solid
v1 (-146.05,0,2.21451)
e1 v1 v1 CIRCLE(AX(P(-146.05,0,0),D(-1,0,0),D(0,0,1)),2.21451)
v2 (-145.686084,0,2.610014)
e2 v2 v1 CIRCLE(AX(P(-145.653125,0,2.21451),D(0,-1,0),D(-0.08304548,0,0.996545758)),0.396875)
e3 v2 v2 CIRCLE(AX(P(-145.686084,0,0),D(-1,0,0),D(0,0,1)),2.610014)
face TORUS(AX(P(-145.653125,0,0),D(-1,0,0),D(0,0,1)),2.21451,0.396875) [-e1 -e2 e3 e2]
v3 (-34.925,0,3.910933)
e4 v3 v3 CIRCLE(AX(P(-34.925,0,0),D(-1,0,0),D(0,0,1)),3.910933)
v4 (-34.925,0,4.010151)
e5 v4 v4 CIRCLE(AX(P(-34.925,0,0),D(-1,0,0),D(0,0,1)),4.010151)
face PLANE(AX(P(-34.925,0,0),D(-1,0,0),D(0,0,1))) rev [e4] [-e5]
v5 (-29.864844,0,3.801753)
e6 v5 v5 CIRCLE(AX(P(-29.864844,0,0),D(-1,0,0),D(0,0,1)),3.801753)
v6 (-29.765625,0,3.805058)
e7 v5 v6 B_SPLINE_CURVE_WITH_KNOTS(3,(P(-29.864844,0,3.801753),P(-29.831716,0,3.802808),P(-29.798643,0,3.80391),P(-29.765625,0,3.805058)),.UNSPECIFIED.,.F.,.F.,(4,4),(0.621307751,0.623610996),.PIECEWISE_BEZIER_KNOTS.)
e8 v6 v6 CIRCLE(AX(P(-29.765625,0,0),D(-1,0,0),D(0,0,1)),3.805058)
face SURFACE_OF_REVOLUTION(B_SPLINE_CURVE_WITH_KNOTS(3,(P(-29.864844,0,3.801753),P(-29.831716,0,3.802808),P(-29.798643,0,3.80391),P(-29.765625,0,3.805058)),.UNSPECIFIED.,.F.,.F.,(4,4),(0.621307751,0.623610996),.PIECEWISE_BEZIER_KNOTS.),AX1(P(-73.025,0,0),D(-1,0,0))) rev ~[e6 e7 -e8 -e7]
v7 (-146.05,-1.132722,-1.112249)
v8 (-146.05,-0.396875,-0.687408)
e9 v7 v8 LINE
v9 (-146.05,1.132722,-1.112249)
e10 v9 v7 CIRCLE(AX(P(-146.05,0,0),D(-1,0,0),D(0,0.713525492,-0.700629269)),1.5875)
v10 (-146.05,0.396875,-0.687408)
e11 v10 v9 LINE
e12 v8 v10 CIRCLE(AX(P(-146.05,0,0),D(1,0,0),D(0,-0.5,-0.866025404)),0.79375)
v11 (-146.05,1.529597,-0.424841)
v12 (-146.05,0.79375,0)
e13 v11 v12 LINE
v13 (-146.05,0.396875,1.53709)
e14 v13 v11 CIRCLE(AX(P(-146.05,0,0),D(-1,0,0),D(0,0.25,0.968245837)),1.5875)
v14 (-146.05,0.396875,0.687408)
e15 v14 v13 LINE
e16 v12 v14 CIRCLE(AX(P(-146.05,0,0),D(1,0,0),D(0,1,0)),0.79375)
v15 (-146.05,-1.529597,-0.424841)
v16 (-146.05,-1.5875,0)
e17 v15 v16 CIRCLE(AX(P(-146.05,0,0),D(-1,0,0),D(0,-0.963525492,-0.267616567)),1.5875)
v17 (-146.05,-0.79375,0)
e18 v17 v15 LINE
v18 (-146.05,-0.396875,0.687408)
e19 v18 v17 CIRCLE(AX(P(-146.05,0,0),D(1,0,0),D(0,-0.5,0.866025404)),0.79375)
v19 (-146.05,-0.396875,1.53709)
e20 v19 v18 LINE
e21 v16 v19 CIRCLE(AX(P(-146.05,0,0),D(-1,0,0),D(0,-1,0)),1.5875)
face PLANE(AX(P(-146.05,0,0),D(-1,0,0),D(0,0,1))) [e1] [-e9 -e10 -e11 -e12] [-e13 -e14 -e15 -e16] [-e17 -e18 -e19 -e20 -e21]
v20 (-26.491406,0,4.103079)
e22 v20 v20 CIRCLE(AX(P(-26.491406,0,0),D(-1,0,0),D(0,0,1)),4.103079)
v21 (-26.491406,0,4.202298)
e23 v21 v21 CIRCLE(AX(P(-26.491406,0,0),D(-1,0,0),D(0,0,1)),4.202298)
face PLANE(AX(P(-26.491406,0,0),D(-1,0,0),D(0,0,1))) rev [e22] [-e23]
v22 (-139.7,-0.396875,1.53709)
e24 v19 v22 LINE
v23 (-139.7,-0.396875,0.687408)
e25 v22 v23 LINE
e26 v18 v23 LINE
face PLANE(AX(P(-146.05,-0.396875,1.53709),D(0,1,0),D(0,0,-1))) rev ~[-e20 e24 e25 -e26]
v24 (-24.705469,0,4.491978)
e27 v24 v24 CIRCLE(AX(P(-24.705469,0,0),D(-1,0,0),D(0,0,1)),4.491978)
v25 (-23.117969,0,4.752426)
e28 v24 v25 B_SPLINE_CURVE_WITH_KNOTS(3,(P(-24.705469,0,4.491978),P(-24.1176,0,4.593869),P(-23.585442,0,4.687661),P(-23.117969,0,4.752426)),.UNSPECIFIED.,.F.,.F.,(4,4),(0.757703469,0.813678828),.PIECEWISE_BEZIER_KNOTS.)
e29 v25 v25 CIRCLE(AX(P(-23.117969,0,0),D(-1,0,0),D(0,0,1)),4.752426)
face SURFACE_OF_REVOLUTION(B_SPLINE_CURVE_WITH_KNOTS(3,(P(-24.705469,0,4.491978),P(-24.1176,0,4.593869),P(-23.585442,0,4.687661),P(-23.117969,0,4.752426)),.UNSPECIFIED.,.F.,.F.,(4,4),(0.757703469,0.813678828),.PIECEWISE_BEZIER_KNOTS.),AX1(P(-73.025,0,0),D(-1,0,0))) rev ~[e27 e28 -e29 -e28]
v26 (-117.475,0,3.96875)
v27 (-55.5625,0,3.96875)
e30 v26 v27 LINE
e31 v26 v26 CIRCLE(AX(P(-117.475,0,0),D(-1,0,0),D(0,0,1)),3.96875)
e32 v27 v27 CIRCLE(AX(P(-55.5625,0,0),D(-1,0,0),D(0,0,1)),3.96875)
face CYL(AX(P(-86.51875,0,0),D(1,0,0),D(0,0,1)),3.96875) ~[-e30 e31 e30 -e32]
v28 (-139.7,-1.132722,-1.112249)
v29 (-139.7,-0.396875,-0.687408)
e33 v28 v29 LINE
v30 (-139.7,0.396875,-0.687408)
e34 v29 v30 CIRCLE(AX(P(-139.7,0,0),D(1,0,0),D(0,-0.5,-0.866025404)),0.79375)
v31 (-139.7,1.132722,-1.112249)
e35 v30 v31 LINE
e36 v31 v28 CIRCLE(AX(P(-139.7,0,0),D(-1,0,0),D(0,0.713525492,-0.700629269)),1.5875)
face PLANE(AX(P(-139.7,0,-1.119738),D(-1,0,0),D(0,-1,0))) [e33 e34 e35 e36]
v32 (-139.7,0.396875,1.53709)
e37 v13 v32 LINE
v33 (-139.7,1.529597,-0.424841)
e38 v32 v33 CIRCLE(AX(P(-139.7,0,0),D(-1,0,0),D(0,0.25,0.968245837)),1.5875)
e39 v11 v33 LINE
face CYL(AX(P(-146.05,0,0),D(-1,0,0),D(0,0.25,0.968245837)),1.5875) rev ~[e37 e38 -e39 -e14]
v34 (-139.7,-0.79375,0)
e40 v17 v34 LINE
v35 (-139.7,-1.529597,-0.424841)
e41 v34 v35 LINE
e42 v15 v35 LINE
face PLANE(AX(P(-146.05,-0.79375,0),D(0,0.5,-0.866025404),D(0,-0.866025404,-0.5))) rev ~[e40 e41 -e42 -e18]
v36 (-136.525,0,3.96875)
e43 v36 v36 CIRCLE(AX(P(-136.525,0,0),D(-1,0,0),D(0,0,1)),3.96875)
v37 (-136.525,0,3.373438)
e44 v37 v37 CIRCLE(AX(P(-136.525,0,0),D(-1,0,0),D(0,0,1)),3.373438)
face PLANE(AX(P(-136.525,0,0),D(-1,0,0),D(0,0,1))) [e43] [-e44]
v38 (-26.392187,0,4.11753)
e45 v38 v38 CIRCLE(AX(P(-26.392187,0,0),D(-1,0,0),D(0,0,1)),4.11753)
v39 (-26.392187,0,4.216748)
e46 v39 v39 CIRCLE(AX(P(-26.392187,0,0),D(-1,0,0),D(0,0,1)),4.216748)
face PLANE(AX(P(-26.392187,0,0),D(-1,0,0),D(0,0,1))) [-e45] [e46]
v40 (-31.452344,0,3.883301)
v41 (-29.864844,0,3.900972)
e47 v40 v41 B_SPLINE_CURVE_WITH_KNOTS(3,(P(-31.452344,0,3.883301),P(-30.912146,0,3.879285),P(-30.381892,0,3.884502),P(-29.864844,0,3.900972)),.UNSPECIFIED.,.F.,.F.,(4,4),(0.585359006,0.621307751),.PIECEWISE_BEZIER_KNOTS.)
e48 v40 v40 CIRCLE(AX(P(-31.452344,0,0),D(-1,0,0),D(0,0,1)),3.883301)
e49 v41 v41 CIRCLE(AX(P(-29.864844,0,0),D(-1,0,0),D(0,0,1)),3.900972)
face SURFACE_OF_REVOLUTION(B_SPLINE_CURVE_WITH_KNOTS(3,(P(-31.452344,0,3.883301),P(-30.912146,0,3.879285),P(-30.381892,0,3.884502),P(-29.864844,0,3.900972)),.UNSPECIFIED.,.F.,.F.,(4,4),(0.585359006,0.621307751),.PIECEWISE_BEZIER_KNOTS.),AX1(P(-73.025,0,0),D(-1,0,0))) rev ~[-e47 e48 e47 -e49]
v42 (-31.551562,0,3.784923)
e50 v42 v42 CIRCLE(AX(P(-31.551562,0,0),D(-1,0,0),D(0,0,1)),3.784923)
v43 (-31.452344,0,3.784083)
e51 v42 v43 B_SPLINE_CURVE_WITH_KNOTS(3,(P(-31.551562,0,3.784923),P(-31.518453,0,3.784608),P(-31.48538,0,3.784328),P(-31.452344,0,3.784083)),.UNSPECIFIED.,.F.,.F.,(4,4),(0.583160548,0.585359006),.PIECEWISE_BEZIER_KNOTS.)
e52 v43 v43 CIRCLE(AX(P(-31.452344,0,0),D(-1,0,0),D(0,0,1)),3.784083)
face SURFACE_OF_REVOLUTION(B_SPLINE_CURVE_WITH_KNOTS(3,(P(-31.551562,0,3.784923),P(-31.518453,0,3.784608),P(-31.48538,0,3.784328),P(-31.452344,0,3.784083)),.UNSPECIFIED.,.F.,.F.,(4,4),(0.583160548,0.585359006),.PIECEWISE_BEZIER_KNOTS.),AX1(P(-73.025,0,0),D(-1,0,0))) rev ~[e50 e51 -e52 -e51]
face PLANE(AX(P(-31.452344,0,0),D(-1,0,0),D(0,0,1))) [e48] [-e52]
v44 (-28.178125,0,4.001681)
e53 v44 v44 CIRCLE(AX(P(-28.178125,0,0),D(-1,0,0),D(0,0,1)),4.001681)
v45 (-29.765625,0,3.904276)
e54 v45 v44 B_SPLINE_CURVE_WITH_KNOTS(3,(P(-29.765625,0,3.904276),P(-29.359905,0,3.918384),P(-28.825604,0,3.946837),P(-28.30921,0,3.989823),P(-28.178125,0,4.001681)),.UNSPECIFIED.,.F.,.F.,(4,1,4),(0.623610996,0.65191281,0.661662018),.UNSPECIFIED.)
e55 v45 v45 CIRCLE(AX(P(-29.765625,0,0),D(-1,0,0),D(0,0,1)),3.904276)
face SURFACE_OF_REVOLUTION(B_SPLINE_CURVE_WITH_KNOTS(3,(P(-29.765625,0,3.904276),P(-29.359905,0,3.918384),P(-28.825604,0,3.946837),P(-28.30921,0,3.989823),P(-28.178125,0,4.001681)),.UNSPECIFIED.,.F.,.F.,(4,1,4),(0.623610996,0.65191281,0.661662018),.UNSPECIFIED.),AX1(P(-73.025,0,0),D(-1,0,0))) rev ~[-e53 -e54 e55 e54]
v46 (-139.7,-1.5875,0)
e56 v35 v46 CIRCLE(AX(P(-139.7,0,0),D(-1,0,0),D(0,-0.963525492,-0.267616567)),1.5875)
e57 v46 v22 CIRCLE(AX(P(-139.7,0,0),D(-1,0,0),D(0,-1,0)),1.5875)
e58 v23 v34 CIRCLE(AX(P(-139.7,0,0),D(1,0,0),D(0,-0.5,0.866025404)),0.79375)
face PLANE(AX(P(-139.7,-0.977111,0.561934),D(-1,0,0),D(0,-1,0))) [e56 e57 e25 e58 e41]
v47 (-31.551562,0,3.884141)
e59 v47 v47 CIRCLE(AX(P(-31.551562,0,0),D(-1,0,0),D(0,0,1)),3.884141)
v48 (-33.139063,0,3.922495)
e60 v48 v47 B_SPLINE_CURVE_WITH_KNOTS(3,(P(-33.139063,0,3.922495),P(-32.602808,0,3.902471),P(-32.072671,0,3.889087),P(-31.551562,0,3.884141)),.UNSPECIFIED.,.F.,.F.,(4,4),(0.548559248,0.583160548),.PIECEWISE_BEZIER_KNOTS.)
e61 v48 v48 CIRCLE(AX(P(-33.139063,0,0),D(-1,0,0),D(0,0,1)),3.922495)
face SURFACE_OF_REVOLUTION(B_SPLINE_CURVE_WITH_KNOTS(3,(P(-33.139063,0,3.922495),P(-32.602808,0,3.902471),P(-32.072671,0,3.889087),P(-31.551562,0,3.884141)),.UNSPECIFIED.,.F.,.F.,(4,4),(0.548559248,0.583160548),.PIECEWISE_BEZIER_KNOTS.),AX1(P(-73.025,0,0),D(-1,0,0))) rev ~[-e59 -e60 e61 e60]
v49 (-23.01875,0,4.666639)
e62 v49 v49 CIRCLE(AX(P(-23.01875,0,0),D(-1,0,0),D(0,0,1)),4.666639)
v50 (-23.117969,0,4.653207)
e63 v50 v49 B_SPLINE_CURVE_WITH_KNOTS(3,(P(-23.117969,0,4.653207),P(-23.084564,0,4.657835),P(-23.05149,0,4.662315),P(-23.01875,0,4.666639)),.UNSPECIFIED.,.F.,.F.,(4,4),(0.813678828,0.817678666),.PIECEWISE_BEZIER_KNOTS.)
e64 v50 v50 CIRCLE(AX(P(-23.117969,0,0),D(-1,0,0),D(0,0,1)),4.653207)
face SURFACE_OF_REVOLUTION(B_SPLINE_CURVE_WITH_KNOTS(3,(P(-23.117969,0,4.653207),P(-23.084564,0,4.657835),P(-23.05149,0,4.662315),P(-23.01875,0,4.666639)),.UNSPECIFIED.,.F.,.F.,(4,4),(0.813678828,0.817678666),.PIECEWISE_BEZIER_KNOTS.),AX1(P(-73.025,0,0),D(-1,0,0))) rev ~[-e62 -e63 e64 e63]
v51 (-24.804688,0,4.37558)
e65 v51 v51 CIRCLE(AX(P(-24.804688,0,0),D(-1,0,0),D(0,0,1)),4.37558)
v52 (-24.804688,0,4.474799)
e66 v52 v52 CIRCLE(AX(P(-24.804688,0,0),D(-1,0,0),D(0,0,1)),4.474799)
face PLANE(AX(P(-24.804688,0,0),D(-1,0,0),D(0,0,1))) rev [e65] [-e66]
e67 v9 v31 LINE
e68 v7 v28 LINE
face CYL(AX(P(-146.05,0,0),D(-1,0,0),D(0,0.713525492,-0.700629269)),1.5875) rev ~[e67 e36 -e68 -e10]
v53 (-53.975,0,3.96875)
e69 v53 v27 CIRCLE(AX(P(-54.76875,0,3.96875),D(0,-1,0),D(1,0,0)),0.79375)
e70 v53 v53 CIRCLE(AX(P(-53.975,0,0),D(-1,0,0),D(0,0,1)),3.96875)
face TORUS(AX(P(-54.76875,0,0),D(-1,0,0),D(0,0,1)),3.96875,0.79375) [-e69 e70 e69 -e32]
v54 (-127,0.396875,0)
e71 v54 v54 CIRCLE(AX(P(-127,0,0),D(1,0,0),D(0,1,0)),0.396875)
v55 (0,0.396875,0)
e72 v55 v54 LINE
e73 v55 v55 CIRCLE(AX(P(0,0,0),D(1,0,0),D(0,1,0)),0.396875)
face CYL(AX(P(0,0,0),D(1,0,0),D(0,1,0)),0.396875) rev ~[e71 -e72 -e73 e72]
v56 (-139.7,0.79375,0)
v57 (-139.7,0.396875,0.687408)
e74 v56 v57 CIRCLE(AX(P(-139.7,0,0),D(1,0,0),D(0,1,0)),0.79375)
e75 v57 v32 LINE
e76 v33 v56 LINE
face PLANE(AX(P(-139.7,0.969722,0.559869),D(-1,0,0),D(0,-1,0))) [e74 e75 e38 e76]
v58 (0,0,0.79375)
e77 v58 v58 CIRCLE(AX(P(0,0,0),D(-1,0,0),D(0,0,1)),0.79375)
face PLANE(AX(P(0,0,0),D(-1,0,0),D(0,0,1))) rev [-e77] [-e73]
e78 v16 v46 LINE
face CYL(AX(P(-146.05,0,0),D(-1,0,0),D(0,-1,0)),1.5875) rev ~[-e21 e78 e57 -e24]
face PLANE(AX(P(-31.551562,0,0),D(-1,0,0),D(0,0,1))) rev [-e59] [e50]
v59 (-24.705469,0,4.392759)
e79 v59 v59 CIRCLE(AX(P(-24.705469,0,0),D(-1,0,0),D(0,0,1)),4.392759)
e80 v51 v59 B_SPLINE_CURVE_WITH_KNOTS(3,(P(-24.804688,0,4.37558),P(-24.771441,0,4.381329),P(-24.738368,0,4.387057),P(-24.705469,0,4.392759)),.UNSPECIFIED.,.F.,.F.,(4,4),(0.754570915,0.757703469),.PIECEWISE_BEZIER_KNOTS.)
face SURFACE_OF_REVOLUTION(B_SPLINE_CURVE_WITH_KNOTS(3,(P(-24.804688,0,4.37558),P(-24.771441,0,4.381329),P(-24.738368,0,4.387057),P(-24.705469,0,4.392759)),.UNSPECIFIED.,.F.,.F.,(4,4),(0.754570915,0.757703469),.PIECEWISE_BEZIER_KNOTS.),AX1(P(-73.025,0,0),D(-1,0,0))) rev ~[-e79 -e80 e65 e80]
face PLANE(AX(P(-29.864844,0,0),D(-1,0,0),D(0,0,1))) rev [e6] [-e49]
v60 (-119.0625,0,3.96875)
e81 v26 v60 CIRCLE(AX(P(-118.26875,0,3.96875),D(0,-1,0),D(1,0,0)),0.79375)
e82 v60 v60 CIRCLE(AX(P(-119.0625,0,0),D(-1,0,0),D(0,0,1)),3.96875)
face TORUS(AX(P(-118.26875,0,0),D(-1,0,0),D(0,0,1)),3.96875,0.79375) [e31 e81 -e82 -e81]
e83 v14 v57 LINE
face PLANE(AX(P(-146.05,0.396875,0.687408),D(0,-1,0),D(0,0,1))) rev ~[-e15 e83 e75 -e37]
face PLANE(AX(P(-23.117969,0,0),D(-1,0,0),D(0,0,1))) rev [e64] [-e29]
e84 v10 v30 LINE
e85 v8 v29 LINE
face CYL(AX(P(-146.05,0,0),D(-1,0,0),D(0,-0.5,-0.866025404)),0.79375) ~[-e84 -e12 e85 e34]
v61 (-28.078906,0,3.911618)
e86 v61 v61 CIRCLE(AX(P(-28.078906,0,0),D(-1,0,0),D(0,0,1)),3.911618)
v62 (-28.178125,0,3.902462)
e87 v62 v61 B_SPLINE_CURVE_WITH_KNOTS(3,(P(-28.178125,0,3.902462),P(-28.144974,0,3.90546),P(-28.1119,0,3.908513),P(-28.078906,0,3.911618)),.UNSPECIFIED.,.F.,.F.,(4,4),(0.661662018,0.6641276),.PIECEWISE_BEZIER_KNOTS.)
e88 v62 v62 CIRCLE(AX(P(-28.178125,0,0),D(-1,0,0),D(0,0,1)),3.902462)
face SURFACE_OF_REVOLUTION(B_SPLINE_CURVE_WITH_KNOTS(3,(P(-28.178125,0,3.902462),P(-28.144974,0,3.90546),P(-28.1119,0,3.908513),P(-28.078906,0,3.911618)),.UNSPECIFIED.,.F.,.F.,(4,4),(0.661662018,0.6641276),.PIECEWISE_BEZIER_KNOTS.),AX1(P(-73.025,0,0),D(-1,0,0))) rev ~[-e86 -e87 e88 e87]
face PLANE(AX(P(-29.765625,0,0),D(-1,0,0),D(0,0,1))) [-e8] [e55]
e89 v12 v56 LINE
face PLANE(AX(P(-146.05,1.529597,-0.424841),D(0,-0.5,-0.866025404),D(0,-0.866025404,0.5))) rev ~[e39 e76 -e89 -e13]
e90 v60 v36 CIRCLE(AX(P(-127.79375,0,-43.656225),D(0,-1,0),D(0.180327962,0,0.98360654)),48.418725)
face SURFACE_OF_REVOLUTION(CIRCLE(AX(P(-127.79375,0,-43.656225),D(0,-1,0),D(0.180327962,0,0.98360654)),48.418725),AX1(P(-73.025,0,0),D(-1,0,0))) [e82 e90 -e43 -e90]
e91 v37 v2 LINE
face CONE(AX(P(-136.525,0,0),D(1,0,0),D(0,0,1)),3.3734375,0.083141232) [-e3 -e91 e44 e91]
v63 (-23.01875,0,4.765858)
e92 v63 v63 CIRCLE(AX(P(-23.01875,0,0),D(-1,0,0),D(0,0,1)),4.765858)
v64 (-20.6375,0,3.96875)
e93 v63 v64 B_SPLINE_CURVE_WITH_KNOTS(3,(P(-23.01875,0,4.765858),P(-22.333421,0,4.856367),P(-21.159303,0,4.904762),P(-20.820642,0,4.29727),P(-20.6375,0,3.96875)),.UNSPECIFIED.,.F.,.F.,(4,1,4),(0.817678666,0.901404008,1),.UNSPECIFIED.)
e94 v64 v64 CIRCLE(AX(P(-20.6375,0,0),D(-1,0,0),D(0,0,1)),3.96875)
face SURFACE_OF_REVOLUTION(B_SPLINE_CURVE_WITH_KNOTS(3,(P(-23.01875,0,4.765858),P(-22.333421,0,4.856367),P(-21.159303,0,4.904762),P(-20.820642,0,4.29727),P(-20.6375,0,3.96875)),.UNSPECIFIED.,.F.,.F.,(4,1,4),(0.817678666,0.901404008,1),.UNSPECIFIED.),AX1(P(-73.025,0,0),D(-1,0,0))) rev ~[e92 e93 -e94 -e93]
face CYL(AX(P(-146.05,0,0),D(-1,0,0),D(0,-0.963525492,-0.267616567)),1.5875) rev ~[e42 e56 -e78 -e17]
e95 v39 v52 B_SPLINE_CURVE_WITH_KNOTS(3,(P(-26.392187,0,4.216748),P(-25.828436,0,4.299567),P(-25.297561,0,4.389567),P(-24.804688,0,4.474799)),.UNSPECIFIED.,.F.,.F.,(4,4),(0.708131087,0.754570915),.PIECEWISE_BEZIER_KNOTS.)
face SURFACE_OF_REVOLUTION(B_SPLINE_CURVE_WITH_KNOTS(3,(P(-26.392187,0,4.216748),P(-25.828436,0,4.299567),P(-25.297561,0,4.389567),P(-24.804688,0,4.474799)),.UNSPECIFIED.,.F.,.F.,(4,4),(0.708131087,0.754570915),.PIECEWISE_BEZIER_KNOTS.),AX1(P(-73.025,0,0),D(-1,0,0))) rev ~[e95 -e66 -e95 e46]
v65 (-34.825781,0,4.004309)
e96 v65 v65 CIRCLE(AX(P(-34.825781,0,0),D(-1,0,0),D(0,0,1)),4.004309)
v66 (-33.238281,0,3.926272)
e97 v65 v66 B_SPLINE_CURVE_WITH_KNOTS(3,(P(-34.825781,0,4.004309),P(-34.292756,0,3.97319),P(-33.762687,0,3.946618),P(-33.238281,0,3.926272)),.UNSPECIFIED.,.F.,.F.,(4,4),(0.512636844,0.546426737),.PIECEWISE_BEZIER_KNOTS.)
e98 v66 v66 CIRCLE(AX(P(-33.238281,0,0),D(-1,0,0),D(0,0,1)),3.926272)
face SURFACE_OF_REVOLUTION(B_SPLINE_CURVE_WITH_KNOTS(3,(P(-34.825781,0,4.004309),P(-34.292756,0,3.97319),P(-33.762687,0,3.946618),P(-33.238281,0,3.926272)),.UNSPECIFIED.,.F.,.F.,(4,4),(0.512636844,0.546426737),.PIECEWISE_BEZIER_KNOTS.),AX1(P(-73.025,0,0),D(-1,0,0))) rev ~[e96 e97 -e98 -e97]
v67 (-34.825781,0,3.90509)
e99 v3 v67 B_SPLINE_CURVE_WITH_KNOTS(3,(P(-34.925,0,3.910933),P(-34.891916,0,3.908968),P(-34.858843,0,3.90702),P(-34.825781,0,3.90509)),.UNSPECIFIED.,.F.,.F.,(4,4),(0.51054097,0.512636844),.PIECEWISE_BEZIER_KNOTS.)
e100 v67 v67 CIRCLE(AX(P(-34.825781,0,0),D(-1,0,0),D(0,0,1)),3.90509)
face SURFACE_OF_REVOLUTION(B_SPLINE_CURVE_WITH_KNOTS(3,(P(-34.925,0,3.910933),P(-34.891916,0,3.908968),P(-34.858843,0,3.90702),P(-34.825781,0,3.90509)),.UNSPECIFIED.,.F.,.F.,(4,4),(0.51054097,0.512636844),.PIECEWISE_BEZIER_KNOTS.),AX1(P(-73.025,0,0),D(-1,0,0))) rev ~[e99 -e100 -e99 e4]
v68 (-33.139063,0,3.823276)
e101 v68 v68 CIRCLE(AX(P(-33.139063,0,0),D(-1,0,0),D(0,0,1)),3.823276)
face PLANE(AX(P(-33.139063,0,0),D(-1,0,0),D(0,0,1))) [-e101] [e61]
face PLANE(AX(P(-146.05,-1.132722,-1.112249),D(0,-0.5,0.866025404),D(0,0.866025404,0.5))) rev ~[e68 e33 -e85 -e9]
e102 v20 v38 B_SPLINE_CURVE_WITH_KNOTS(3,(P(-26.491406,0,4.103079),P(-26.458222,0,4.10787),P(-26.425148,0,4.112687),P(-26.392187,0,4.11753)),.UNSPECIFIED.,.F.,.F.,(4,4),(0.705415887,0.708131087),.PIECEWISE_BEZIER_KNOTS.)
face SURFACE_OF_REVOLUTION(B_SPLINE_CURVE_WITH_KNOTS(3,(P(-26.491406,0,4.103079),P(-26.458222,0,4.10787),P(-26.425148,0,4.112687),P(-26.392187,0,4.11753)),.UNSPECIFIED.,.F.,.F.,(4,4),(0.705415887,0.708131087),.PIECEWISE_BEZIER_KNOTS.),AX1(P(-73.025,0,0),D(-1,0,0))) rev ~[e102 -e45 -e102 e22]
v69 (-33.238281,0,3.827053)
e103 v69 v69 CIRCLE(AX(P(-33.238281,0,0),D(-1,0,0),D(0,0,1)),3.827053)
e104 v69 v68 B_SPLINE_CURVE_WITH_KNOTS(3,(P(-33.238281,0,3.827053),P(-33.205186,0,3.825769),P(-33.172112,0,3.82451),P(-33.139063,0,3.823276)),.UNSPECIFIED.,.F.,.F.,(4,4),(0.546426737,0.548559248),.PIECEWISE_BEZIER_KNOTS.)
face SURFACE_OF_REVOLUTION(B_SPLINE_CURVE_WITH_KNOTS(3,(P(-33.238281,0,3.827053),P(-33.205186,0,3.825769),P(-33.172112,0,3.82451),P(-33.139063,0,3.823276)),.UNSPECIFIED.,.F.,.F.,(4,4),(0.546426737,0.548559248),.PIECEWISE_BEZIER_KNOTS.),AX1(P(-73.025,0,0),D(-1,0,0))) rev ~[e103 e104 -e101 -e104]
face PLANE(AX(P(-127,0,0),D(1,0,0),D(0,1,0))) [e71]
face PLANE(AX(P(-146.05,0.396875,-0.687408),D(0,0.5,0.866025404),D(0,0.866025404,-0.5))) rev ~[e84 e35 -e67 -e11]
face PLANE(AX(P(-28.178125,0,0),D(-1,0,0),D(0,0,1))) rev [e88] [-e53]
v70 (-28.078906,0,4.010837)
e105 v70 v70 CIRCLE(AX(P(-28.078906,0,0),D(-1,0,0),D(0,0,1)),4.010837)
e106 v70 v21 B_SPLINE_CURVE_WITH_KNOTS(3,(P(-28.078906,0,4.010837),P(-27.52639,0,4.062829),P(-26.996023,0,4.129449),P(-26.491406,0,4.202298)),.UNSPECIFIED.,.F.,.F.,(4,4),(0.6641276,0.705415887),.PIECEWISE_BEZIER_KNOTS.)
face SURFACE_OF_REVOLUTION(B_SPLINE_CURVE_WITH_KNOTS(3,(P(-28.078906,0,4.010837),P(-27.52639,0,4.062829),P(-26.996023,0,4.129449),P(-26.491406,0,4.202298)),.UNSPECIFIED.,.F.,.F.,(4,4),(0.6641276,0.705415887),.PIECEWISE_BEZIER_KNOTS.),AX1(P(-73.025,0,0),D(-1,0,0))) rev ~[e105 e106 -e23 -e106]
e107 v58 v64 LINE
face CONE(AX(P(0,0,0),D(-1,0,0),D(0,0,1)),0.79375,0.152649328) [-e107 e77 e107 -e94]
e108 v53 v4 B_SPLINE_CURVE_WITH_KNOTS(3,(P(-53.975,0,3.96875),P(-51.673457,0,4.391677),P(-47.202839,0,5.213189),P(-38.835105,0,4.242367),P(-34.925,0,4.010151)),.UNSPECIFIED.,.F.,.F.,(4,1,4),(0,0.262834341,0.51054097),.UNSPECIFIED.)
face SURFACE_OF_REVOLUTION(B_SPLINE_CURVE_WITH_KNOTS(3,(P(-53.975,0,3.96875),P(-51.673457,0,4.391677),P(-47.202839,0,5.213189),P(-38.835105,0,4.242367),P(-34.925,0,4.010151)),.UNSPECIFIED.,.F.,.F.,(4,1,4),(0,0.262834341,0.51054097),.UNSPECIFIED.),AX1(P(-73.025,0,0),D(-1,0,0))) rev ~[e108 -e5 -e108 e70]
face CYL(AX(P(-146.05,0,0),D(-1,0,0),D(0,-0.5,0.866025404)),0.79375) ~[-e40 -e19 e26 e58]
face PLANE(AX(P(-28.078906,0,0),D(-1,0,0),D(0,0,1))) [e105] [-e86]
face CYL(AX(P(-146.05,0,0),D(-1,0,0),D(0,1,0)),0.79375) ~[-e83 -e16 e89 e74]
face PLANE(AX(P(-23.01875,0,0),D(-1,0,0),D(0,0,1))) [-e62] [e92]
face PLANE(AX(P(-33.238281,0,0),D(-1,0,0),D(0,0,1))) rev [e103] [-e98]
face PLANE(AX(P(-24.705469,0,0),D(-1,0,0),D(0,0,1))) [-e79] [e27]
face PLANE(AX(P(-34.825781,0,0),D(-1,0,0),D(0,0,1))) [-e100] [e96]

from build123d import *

# Parameters (mm, degrees)
F0_W     = 61.9125
F0_H     = 3.96875
F2_R     = 0.396875
F3_DEPTH = 127
F5_DEPTH = 6.35


# Not quite as in the source:
# - a length typed as a fraction of an inch, garbled in the dataset ("3 / 203.2 mm" for 3/8 in), is restored


with BuildPart() as f1:
    # F0 (on Front) → F1 (revolve)
    with BuildSketch(Plane.XZ):
        Polygon((-20.6375, 0), (0, 0), (0, 0.79375), (-20.6375, 3.96875), (-20.6375, 3.86953125), align=None)
        with BuildLine():
            Line((-55.5625, 0), (-20.6375, 0))
            Line((-20.6375, 0), (-20.6375, 3.86953125))
            add(Edge.make_bspline(
                [(-23.01875, 4.6666390523), (-22.3334209886, 4.7571479317), (-21.1593030797, 4.80554296), (-20.820641756, 4.1980514041), (-20.6375, 3.86953125)],
                knots=[0.8176786656, 0.8176786656, 0.8176786656, 0.8176786656, 0.9014040075, 1, 1, 1, 1], degree=3))
            add(Edge.make_bspline(
                [(-23.11796875, 4.6532074188), (-23.0845644542, 4.6578353858), (-23.0514904461, 4.6623151422), (-23.01875, 4.6666390523)],
                knots=[0.8136788276, 0.8136788276, 0.8136788276, 0.8136788276, 0.8176786656, 0.8176786656, 0.8176786656, 0.8176786656], degree=3))
            add(Edge.make_bspline(
                [(-24.70546875, 4.3927589159), (-24.117599982, 4.4946500328), (-23.585442034, 4.5884417681), (-23.11796875, 4.6532074188)],
                knots=[0.7577034694, 0.7577034694, 0.7577034694, 0.7577034694, 0.8136788276, 0.8136788276, 0.8136788276, 0.8136788276], degree=3))
            add(Edge.make_bspline(
                [(-24.8046875, 4.3755800551), (-24.7714411529, 4.381329263), (-24.7383677119, 4.3870567725), (-24.70546875, 4.3927589159)],
                knots=[0.7545709145, 0.7545709145, 0.7545709145, 0.7545709145, 0.7577034694, 0.7577034694, 0.7577034694, 0.7577034694], degree=3))
            add(Edge.make_bspline(
                [(-26.3921875, 4.1175295828), (-25.8284362948, 4.2003483086), (-25.2975614293, 4.290348595), (-24.8046875, 4.3755800551)],
                knots=[0.7081310867, 0.7081310867, 0.7081310867, 0.7081310867, 0.7545709145, 0.7545709145, 0.7545709145, 0.7545709145], degree=3))
            add(Edge.make_bspline(
                [(-26.49140625, 4.1030791182), (-26.4582216318, 4.107869798), (-26.4251483737, 4.1126874157), (-26.3921875, 4.1175295828)],
                knots=[0.7054158867, 0.7054158867, 0.7054158867, 0.7054158867, 0.7081310867, 0.7081310867, 0.7081310867, 0.7081310867], degree=3))
            add(Edge.make_bspline(
                [(-28.07890625, 3.911617905), (-27.5263903446, 3.9636105229), (-26.9960232193, 4.0302303565), (-26.49140625, 4.1030791182)],
                knots=[0.6641276004, 0.6641276004, 0.6641276004, 0.6641276004, 0.7054158867, 0.7054158867, 0.7054158867, 0.7054158867], degree=3))
            add(Edge.make_bspline(
                [(-28.178125, 3.9024617612), (-28.1449736113, 3.9054604557), (-28.111900439, 3.9085130998), (-28.07890625, 3.911617905)],
                knots=[0.6616620179, 0.6616620179, 0.6616620179, 0.6616620179, 0.6641276004, 0.6641276004, 0.6641276004, 0.6641276004], degree=3))
            add(Edge.make_bspline(
                [(-29.765625, 3.8050576904), (-29.3599047919, 3.8191656206), (-28.8256037638, 3.8476182782), (-28.3092095533, 3.8906045646), (-28.178125, 3.9024617612)],
                knots=[0.6236109964, 0.6236109964, 0.6236109964, 0.6236109964, 0.6519128102, 0.6616620179, 0.6616620179, 0.6616620179, 0.6616620179], degree=3))
            add(Edge.make_bspline(
                [(-29.86484375, 3.8017529539), (-29.8317163379, 3.8028081635), (-29.7986431352, 3.8039095653), (-29.765625, 3.8050576904)],
                knots=[0.6213077512, 0.6213077512, 0.6213077512, 0.6213077512, 0.6236109964, 0.6236109964, 0.6236109964, 0.6236109964], degree=3))
            add(Edge.make_bspline(
                [(-31.45234375, 3.784082632), (-30.9121459933, 3.7800664759), (-30.3818920053, 3.7852833825), (-29.86484375, 3.8017529539)],
                knots=[0.5853590058, 0.5853590058, 0.5853590058, 0.5853590058, 0.6213077512, 0.6213077512, 0.6213077512, 0.6213077512], degree=3))
            add(Edge.make_bspline(
                [(-31.5515625, 3.7849225925), (-31.5184528913, 3.7846083822), (-31.4853797259, 3.7843282414), (-31.45234375, 3.784082632)],
                knots=[0.5831605481, 0.5831605481, 0.5831605481, 0.5831605481, 0.5853590058, 0.5853590058, 0.5853590058, 0.5853590058], degree=3))
            add(Edge.make_bspline(
                [(-33.1390625, 3.8232760222), (-32.6028075002, 3.8032526962), (-32.0726712529, 3.7898679164), (-31.5515625, 3.7849225925)],
                knots=[0.5485592476, 0.5485592476, 0.5485592476, 0.5485592476, 0.5831605481, 0.5831605481, 0.5831605481, 0.5831605481], degree=3))
            add(Edge.make_bspline(
                [(-33.23828125, 3.8270534172), (-33.205185546, 3.8257693509), (-33.1721124023, 3.8245100787), (-33.1390625, 3.8232760222)],
                knots=[0.5464267368, 0.5464267368, 0.5464267368, 0.5464267368, 0.5485592476, 0.5485592476, 0.5485592476, 0.5485592476], degree=3))
            add(Edge.make_bspline(
                [(-34.82578125, 3.9050898088), (-34.2927563116, 3.8739707874), (-33.7626866879, 3.8473996028), (-33.23828125, 3.8270534172)],
                knots=[0.5126368442, 0.5126368442, 0.5126368442, 0.5126368442, 0.5464267368, 0.5464267368, 0.5464267368, 0.5464267368], degree=3))
            add(Edge.make_bspline(
                [(-34.925, 3.9109325272), (-34.8919161443, 3.9089677243), (-34.8588430121, 3.9070200181), (-34.82578125, 3.9050898088)],
                knots=[0.5105409697, 0.5105409697, 0.5105409697, 0.5105409697, 0.5126368442, 0.5126368442, 0.5126368442, 0.5126368442], degree=3))
            Line((-34.925, 3.9109325272), (-34.925, 4.0101512772))
            add(Edge.make_bspline(
                [(-53.975, 3.96875), (-51.6734572333, 4.3916770235), (-47.2028394574, 5.2131890531), (-38.8351054319, 4.2423668511), (-34.925, 4.0101512772)],
                knots=[0, 0, 0, 0, 0.2628343408, 0.5105409697, 0.5105409697, 0.5105409697, 0.5105409697], degree=3))
            ThreePointArc((-53.975, 3.96875), (-54.76875, 4.7625), (-55.5625, 3.96875))
            Line((-55.5625, 3.96875), (-55.5625, 0))
        make_face()
        with Locations((-86.51875, 1.984375)):
            Rectangle(F0_W, F0_H)
        with BuildLine():
            add(Edge.make_bspline(
                [(-23.01875, 4.6666390523), (-22.3334209886, 4.7571479317), (-21.1593030797, 4.80554296), (-20.820641756, 4.1980514041), (-20.6375, 3.86953125)],
                knots=[0.8176786656, 0.8176786656, 0.8176786656, 0.8176786656, 0.9014040075, 1, 1, 1, 1], degree=3))
            Line((-20.6375, 3.86953125), (-20.6375, 3.96875))
            add(Edge.make_bspline(
                [(-23.01875, 4.7658578023), (-22.3334209886, 4.8563666817), (-21.1593030797, 4.90476171), (-20.820641756, 4.2972701541), (-20.6375, 3.96875)],
                knots=[0.8176786656, 0.8176786656, 0.8176786656, 0.8176786656, 0.9014040075, 1, 1, 1, 1], degree=3))
            Line((-23.01875, 4.7658578023), (-23.01875, 4.6666390523))
        make_face()
        with BuildLine():
            Line((-136.525, 0), (-117.475, 0))
            Line((-117.475, 0), (-117.475, 3.96875))
            ThreePointArc((-117.475, 3.96875), (-118.26875, 4.7625), (-119.0625, 3.96875))
            ThreePointArc((-119.0625, 3.96875), (-127.79375, 4.7625004164), (-136.525, 3.96875))
            Line((-136.525, 3.96875), (-136.525, 3.3734375))
            Line((-136.525, 3.3734375), (-136.525, 0))
        make_face()
        with BuildLine():
            Line((-146.05, 0), (-136.525, 0))
            Line((-136.525, 0), (-136.525, 3.3734375))
            Line((-136.525, 3.3734375), (-145.6860836748, 2.6100138604))
            ThreePointArc((-145.6860836748, 2.6100138604), (-145.9451782825, 2.4832375911), (-146.05, 2.2145097626))
            Line((-146.05, 2.2145097626), (-146.05, 0))
        make_face()
        with BuildLine():
            add(Edge.make_bspline(
                [(-24.70546875, 4.3927589159), (-24.117599982, 4.4946500328), (-23.585442034, 4.5884417681), (-23.11796875, 4.6532074188)],
                knots=[0.7577034694, 0.7577034694, 0.7577034694, 0.7577034694, 0.8136788276, 0.8136788276, 0.8136788276, 0.8136788276], degree=3))
            Line((-23.11796875, 4.6532074188), (-23.11796875, 4.7524261688))
            add(Edge.make_bspline(
                [(-24.70546875, 4.4919776659), (-24.117599982, 4.5938687828), (-23.585442034, 4.6876605181), (-23.11796875, 4.7524261688)],
                knots=[0.7577034694, 0.7577034694, 0.7577034694, 0.7577034694, 0.8136788276, 0.8136788276, 0.8136788276, 0.8136788276], degree=3))
            Line((-24.70546875, 4.4919776659), (-24.70546875, 4.3927589159))
        make_face()
        with BuildLine():
            add(Edge.make_bspline(
                [(-34.82578125, 4.0043085588), (-34.2927563116, 3.9731895374), (-33.7626866879, 3.9466183528), (-33.23828125, 3.9262721672)],
                knots=[0.5126368442, 0.5126368442, 0.5126368442, 0.5126368442, 0.5464267368, 0.5464267368, 0.5464267368, 0.5464267368], degree=3))
            Line((-34.82578125, 4.0043085588), (-34.82578125, 3.9050898088))
            add(Edge.make_bspline(
                [(-34.82578125, 3.9050898088), (-34.2927563116, 3.8739707874), (-33.7626866879, 3.8473996028), (-33.23828125, 3.8270534172)],
                knots=[0.5126368442, 0.5126368442, 0.5126368442, 0.5126368442, 0.5464267368, 0.5464267368, 0.5464267368, 0.5464267368], degree=3))
            Line((-33.23828125, 3.8270534172), (-33.23828125, 3.9262721672))
        make_face()
        with BuildLine():
            add(Edge.make_bspline(
                [(-26.3921875, 4.1175295828), (-25.8284362948, 4.2003483086), (-25.2975614293, 4.290348595), (-24.8046875, 4.3755800551)],
                knots=[0.7081310867, 0.7081310867, 0.7081310867, 0.7081310867, 0.7545709145, 0.7545709145, 0.7545709145, 0.7545709145], degree=3))
            Line((-24.8046875, 4.3755800551), (-24.8046875, 4.4747988051))
            add(Edge.make_bspline(
                [(-26.3921875, 4.2167483328), (-25.8284362948, 4.2995670586), (-25.2975614293, 4.389567345), (-24.8046875, 4.4747988051)],
                knots=[0.7081310867, 0.7081310867, 0.7081310867, 0.7081310867, 0.7545709145, 0.7545709145, 0.7545709145, 0.7545709145], degree=3))
            Line((-26.3921875, 4.2167483328), (-26.3921875, 4.1175295828))
        make_face()
        with BuildLine():
            add(Edge.make_bspline(
                [(-33.1390625, 3.9224947722), (-32.6028075002, 3.9024714462), (-32.0726712529, 3.8890866664), (-31.5515625, 3.8841413425)],
                knots=[0.5485592476, 0.5485592476, 0.5485592476, 0.5485592476, 0.5831605481, 0.5831605481, 0.5831605481, 0.5831605481], degree=3))
            Line((-33.1390625, 3.9224947722), (-33.1390625, 3.8232760222))
            add(Edge.make_bspline(
                [(-33.1390625, 3.8232760222), (-32.6028075002, 3.8032526962), (-32.0726712529, 3.7898679164), (-31.5515625, 3.7849225925)],
                knots=[0.5485592476, 0.5485592476, 0.5485592476, 0.5485592476, 0.5831605481, 0.5831605481, 0.5831605481, 0.5831605481], degree=3))
            Line((-31.5515625, 3.7849225925), (-31.5515625, 3.8841413425))
        make_face()
        with BuildLine():
            add(Edge.make_bspline(
                [(-28.07890625, 3.911617905), (-27.5263903446, 3.9636105229), (-26.9960232193, 4.0302303565), (-26.49140625, 4.1030791182)],
                knots=[0.6641276004, 0.6641276004, 0.6641276004, 0.6641276004, 0.7054158867, 0.7054158867, 0.7054158867, 0.7054158867], degree=3))
            Line((-26.49140625, 4.1030791182), (-26.49140625, 4.2022978682))
            add(Edge.make_bspline(
                [(-28.07890625, 4.010836655), (-27.5263903446, 4.0628292729), (-26.9960232193, 4.1294491065), (-26.49140625, 4.2022978682)],
                knots=[0.6641276004, 0.6641276004, 0.6641276004, 0.6641276004, 0.7054158867, 0.7054158867, 0.7054158867, 0.7054158867], degree=3))
            Line((-28.07890625, 4.010836655), (-28.07890625, 3.911617905))
        make_face()
        with BuildLine():
            add(Edge.make_bspline(
                [(-31.45234375, 3.883301382), (-30.9121459933, 3.8792852259), (-30.3818920053, 3.8845021325), (-29.86484375, 3.9009717039)],
                knots=[0.5853590058, 0.5853590058, 0.5853590058, 0.5853590058, 0.6213077512, 0.6213077512, 0.6213077512, 0.6213077512], degree=3))
            Line((-31.45234375, 3.883301382), (-31.45234375, 3.784082632))
            add(Edge.make_bspline(
                [(-31.45234375, 3.784082632), (-30.9121459933, 3.7800664759), (-30.3818920053, 3.7852833825), (-29.86484375, 3.8017529539)],
                knots=[0.5853590058, 0.5853590058, 0.5853590058, 0.5853590058, 0.6213077512, 0.6213077512, 0.6213077512, 0.6213077512], degree=3))
            Line((-29.86484375, 3.8017529539), (-29.86484375, 3.9009717039))
        make_face()
        with BuildLine():
            add(Edge.make_bspline(
                [(-29.765625, 3.8050576904), (-29.3599047919, 3.8191656206), (-28.8256037638, 3.8476182782), (-28.3092095533, 3.8906045646), (-28.178125, 3.9024617612)],
                knots=[0.6236109964, 0.6236109964, 0.6236109964, 0.6236109964, 0.6519128102, 0.6616620179, 0.6616620179, 0.6616620179, 0.6616620179], degree=3))
            Line((-28.178125, 3.9024617612), (-28.178125, 4.0016805112))
            add(Edge.make_bspline(
                [(-29.765625, 3.9042764404), (-29.3599047919, 3.9183843706), (-28.8256037638, 3.9468370282), (-28.3092095533, 3.9898233146), (-28.178125, 4.0016805112)],
                knots=[0.6236109964, 0.6236109964, 0.6236109964, 0.6236109964, 0.6519128102, 0.6616620179, 0.6616620179, 0.6616620179, 0.6616620179], degree=3))
            Line((-29.765625, 3.9042764404), (-29.765625, 3.8050576904))
        make_face()
    revolve(axis=Axis((-73.025, 0, 0), (-1, 0, 0)))

    # F2 (on face) → F3 (cut)
    with BuildSketch(Plane.YZ):
        Circle(F2_R)
    extrude(amount=-F3_DEPTH, mode=Mode.SUBTRACT)

    # F4 (on face) → F5 (cut)
    with BuildSketch(Plane(origin=(-146.05, 0, 0), x_dir=(0, -1, 0), z_dir=(-1, 0, 0))):
        with BuildLine():
            Line((-0.396875, 0.6874076643), (-0.396875, 1.5370902655))
            ThreePointArc((-0.396875, 1.5370902655), (-1.3748153285, 0.79375), (-1.5295967179, -0.4248413006))
            Line((-1.5295967179, -0.4248413006), (-0.79375, 0))
            ThreePointArc((-0.79375, 0), (-0.6874076643, 0.396875), (-0.396875, 0.6874076643))
        make_face()
        with BuildLine():
            ThreePointArc((1.5295967179, -0.4248413006), (1.5729575709, -0.2143845382), (1.5875, 0))
            ThreePointArc((1.5875, 0), (1.2550289464, 0.9721412417), (0.396875, 1.5370902655))
            Line((0.396875, 1.5370902655), (0.396875, 0.6874076643))
            ThreePointArc((0.396875, 0.6874076643), (0.6874076643, 0.396875), (0.79375, 0))
            Line((0.79375, 0), (1.5295967179, -0.4248413006))
        make_face()
        with BuildLine():
            ThreePointArc((-1.1327217179, -1.1122489649), (0, -1.5875), (1.1327217179, -1.1122489649))
            Line((1.1327217179, -1.1122489649), (0.396875, -0.6874076643))
            ThreePointArc((0.396875, -0.6874076643), (0, -0.79375), (-0.396875, -0.6874076643))
            Line((-0.396875, -0.6874076643), (-1.1327217179, -1.1122489649))
        make_face()
    extrude(amount=-F5_DEPTH, mode=Mode.SUBTRACT)


solid = f1.part
